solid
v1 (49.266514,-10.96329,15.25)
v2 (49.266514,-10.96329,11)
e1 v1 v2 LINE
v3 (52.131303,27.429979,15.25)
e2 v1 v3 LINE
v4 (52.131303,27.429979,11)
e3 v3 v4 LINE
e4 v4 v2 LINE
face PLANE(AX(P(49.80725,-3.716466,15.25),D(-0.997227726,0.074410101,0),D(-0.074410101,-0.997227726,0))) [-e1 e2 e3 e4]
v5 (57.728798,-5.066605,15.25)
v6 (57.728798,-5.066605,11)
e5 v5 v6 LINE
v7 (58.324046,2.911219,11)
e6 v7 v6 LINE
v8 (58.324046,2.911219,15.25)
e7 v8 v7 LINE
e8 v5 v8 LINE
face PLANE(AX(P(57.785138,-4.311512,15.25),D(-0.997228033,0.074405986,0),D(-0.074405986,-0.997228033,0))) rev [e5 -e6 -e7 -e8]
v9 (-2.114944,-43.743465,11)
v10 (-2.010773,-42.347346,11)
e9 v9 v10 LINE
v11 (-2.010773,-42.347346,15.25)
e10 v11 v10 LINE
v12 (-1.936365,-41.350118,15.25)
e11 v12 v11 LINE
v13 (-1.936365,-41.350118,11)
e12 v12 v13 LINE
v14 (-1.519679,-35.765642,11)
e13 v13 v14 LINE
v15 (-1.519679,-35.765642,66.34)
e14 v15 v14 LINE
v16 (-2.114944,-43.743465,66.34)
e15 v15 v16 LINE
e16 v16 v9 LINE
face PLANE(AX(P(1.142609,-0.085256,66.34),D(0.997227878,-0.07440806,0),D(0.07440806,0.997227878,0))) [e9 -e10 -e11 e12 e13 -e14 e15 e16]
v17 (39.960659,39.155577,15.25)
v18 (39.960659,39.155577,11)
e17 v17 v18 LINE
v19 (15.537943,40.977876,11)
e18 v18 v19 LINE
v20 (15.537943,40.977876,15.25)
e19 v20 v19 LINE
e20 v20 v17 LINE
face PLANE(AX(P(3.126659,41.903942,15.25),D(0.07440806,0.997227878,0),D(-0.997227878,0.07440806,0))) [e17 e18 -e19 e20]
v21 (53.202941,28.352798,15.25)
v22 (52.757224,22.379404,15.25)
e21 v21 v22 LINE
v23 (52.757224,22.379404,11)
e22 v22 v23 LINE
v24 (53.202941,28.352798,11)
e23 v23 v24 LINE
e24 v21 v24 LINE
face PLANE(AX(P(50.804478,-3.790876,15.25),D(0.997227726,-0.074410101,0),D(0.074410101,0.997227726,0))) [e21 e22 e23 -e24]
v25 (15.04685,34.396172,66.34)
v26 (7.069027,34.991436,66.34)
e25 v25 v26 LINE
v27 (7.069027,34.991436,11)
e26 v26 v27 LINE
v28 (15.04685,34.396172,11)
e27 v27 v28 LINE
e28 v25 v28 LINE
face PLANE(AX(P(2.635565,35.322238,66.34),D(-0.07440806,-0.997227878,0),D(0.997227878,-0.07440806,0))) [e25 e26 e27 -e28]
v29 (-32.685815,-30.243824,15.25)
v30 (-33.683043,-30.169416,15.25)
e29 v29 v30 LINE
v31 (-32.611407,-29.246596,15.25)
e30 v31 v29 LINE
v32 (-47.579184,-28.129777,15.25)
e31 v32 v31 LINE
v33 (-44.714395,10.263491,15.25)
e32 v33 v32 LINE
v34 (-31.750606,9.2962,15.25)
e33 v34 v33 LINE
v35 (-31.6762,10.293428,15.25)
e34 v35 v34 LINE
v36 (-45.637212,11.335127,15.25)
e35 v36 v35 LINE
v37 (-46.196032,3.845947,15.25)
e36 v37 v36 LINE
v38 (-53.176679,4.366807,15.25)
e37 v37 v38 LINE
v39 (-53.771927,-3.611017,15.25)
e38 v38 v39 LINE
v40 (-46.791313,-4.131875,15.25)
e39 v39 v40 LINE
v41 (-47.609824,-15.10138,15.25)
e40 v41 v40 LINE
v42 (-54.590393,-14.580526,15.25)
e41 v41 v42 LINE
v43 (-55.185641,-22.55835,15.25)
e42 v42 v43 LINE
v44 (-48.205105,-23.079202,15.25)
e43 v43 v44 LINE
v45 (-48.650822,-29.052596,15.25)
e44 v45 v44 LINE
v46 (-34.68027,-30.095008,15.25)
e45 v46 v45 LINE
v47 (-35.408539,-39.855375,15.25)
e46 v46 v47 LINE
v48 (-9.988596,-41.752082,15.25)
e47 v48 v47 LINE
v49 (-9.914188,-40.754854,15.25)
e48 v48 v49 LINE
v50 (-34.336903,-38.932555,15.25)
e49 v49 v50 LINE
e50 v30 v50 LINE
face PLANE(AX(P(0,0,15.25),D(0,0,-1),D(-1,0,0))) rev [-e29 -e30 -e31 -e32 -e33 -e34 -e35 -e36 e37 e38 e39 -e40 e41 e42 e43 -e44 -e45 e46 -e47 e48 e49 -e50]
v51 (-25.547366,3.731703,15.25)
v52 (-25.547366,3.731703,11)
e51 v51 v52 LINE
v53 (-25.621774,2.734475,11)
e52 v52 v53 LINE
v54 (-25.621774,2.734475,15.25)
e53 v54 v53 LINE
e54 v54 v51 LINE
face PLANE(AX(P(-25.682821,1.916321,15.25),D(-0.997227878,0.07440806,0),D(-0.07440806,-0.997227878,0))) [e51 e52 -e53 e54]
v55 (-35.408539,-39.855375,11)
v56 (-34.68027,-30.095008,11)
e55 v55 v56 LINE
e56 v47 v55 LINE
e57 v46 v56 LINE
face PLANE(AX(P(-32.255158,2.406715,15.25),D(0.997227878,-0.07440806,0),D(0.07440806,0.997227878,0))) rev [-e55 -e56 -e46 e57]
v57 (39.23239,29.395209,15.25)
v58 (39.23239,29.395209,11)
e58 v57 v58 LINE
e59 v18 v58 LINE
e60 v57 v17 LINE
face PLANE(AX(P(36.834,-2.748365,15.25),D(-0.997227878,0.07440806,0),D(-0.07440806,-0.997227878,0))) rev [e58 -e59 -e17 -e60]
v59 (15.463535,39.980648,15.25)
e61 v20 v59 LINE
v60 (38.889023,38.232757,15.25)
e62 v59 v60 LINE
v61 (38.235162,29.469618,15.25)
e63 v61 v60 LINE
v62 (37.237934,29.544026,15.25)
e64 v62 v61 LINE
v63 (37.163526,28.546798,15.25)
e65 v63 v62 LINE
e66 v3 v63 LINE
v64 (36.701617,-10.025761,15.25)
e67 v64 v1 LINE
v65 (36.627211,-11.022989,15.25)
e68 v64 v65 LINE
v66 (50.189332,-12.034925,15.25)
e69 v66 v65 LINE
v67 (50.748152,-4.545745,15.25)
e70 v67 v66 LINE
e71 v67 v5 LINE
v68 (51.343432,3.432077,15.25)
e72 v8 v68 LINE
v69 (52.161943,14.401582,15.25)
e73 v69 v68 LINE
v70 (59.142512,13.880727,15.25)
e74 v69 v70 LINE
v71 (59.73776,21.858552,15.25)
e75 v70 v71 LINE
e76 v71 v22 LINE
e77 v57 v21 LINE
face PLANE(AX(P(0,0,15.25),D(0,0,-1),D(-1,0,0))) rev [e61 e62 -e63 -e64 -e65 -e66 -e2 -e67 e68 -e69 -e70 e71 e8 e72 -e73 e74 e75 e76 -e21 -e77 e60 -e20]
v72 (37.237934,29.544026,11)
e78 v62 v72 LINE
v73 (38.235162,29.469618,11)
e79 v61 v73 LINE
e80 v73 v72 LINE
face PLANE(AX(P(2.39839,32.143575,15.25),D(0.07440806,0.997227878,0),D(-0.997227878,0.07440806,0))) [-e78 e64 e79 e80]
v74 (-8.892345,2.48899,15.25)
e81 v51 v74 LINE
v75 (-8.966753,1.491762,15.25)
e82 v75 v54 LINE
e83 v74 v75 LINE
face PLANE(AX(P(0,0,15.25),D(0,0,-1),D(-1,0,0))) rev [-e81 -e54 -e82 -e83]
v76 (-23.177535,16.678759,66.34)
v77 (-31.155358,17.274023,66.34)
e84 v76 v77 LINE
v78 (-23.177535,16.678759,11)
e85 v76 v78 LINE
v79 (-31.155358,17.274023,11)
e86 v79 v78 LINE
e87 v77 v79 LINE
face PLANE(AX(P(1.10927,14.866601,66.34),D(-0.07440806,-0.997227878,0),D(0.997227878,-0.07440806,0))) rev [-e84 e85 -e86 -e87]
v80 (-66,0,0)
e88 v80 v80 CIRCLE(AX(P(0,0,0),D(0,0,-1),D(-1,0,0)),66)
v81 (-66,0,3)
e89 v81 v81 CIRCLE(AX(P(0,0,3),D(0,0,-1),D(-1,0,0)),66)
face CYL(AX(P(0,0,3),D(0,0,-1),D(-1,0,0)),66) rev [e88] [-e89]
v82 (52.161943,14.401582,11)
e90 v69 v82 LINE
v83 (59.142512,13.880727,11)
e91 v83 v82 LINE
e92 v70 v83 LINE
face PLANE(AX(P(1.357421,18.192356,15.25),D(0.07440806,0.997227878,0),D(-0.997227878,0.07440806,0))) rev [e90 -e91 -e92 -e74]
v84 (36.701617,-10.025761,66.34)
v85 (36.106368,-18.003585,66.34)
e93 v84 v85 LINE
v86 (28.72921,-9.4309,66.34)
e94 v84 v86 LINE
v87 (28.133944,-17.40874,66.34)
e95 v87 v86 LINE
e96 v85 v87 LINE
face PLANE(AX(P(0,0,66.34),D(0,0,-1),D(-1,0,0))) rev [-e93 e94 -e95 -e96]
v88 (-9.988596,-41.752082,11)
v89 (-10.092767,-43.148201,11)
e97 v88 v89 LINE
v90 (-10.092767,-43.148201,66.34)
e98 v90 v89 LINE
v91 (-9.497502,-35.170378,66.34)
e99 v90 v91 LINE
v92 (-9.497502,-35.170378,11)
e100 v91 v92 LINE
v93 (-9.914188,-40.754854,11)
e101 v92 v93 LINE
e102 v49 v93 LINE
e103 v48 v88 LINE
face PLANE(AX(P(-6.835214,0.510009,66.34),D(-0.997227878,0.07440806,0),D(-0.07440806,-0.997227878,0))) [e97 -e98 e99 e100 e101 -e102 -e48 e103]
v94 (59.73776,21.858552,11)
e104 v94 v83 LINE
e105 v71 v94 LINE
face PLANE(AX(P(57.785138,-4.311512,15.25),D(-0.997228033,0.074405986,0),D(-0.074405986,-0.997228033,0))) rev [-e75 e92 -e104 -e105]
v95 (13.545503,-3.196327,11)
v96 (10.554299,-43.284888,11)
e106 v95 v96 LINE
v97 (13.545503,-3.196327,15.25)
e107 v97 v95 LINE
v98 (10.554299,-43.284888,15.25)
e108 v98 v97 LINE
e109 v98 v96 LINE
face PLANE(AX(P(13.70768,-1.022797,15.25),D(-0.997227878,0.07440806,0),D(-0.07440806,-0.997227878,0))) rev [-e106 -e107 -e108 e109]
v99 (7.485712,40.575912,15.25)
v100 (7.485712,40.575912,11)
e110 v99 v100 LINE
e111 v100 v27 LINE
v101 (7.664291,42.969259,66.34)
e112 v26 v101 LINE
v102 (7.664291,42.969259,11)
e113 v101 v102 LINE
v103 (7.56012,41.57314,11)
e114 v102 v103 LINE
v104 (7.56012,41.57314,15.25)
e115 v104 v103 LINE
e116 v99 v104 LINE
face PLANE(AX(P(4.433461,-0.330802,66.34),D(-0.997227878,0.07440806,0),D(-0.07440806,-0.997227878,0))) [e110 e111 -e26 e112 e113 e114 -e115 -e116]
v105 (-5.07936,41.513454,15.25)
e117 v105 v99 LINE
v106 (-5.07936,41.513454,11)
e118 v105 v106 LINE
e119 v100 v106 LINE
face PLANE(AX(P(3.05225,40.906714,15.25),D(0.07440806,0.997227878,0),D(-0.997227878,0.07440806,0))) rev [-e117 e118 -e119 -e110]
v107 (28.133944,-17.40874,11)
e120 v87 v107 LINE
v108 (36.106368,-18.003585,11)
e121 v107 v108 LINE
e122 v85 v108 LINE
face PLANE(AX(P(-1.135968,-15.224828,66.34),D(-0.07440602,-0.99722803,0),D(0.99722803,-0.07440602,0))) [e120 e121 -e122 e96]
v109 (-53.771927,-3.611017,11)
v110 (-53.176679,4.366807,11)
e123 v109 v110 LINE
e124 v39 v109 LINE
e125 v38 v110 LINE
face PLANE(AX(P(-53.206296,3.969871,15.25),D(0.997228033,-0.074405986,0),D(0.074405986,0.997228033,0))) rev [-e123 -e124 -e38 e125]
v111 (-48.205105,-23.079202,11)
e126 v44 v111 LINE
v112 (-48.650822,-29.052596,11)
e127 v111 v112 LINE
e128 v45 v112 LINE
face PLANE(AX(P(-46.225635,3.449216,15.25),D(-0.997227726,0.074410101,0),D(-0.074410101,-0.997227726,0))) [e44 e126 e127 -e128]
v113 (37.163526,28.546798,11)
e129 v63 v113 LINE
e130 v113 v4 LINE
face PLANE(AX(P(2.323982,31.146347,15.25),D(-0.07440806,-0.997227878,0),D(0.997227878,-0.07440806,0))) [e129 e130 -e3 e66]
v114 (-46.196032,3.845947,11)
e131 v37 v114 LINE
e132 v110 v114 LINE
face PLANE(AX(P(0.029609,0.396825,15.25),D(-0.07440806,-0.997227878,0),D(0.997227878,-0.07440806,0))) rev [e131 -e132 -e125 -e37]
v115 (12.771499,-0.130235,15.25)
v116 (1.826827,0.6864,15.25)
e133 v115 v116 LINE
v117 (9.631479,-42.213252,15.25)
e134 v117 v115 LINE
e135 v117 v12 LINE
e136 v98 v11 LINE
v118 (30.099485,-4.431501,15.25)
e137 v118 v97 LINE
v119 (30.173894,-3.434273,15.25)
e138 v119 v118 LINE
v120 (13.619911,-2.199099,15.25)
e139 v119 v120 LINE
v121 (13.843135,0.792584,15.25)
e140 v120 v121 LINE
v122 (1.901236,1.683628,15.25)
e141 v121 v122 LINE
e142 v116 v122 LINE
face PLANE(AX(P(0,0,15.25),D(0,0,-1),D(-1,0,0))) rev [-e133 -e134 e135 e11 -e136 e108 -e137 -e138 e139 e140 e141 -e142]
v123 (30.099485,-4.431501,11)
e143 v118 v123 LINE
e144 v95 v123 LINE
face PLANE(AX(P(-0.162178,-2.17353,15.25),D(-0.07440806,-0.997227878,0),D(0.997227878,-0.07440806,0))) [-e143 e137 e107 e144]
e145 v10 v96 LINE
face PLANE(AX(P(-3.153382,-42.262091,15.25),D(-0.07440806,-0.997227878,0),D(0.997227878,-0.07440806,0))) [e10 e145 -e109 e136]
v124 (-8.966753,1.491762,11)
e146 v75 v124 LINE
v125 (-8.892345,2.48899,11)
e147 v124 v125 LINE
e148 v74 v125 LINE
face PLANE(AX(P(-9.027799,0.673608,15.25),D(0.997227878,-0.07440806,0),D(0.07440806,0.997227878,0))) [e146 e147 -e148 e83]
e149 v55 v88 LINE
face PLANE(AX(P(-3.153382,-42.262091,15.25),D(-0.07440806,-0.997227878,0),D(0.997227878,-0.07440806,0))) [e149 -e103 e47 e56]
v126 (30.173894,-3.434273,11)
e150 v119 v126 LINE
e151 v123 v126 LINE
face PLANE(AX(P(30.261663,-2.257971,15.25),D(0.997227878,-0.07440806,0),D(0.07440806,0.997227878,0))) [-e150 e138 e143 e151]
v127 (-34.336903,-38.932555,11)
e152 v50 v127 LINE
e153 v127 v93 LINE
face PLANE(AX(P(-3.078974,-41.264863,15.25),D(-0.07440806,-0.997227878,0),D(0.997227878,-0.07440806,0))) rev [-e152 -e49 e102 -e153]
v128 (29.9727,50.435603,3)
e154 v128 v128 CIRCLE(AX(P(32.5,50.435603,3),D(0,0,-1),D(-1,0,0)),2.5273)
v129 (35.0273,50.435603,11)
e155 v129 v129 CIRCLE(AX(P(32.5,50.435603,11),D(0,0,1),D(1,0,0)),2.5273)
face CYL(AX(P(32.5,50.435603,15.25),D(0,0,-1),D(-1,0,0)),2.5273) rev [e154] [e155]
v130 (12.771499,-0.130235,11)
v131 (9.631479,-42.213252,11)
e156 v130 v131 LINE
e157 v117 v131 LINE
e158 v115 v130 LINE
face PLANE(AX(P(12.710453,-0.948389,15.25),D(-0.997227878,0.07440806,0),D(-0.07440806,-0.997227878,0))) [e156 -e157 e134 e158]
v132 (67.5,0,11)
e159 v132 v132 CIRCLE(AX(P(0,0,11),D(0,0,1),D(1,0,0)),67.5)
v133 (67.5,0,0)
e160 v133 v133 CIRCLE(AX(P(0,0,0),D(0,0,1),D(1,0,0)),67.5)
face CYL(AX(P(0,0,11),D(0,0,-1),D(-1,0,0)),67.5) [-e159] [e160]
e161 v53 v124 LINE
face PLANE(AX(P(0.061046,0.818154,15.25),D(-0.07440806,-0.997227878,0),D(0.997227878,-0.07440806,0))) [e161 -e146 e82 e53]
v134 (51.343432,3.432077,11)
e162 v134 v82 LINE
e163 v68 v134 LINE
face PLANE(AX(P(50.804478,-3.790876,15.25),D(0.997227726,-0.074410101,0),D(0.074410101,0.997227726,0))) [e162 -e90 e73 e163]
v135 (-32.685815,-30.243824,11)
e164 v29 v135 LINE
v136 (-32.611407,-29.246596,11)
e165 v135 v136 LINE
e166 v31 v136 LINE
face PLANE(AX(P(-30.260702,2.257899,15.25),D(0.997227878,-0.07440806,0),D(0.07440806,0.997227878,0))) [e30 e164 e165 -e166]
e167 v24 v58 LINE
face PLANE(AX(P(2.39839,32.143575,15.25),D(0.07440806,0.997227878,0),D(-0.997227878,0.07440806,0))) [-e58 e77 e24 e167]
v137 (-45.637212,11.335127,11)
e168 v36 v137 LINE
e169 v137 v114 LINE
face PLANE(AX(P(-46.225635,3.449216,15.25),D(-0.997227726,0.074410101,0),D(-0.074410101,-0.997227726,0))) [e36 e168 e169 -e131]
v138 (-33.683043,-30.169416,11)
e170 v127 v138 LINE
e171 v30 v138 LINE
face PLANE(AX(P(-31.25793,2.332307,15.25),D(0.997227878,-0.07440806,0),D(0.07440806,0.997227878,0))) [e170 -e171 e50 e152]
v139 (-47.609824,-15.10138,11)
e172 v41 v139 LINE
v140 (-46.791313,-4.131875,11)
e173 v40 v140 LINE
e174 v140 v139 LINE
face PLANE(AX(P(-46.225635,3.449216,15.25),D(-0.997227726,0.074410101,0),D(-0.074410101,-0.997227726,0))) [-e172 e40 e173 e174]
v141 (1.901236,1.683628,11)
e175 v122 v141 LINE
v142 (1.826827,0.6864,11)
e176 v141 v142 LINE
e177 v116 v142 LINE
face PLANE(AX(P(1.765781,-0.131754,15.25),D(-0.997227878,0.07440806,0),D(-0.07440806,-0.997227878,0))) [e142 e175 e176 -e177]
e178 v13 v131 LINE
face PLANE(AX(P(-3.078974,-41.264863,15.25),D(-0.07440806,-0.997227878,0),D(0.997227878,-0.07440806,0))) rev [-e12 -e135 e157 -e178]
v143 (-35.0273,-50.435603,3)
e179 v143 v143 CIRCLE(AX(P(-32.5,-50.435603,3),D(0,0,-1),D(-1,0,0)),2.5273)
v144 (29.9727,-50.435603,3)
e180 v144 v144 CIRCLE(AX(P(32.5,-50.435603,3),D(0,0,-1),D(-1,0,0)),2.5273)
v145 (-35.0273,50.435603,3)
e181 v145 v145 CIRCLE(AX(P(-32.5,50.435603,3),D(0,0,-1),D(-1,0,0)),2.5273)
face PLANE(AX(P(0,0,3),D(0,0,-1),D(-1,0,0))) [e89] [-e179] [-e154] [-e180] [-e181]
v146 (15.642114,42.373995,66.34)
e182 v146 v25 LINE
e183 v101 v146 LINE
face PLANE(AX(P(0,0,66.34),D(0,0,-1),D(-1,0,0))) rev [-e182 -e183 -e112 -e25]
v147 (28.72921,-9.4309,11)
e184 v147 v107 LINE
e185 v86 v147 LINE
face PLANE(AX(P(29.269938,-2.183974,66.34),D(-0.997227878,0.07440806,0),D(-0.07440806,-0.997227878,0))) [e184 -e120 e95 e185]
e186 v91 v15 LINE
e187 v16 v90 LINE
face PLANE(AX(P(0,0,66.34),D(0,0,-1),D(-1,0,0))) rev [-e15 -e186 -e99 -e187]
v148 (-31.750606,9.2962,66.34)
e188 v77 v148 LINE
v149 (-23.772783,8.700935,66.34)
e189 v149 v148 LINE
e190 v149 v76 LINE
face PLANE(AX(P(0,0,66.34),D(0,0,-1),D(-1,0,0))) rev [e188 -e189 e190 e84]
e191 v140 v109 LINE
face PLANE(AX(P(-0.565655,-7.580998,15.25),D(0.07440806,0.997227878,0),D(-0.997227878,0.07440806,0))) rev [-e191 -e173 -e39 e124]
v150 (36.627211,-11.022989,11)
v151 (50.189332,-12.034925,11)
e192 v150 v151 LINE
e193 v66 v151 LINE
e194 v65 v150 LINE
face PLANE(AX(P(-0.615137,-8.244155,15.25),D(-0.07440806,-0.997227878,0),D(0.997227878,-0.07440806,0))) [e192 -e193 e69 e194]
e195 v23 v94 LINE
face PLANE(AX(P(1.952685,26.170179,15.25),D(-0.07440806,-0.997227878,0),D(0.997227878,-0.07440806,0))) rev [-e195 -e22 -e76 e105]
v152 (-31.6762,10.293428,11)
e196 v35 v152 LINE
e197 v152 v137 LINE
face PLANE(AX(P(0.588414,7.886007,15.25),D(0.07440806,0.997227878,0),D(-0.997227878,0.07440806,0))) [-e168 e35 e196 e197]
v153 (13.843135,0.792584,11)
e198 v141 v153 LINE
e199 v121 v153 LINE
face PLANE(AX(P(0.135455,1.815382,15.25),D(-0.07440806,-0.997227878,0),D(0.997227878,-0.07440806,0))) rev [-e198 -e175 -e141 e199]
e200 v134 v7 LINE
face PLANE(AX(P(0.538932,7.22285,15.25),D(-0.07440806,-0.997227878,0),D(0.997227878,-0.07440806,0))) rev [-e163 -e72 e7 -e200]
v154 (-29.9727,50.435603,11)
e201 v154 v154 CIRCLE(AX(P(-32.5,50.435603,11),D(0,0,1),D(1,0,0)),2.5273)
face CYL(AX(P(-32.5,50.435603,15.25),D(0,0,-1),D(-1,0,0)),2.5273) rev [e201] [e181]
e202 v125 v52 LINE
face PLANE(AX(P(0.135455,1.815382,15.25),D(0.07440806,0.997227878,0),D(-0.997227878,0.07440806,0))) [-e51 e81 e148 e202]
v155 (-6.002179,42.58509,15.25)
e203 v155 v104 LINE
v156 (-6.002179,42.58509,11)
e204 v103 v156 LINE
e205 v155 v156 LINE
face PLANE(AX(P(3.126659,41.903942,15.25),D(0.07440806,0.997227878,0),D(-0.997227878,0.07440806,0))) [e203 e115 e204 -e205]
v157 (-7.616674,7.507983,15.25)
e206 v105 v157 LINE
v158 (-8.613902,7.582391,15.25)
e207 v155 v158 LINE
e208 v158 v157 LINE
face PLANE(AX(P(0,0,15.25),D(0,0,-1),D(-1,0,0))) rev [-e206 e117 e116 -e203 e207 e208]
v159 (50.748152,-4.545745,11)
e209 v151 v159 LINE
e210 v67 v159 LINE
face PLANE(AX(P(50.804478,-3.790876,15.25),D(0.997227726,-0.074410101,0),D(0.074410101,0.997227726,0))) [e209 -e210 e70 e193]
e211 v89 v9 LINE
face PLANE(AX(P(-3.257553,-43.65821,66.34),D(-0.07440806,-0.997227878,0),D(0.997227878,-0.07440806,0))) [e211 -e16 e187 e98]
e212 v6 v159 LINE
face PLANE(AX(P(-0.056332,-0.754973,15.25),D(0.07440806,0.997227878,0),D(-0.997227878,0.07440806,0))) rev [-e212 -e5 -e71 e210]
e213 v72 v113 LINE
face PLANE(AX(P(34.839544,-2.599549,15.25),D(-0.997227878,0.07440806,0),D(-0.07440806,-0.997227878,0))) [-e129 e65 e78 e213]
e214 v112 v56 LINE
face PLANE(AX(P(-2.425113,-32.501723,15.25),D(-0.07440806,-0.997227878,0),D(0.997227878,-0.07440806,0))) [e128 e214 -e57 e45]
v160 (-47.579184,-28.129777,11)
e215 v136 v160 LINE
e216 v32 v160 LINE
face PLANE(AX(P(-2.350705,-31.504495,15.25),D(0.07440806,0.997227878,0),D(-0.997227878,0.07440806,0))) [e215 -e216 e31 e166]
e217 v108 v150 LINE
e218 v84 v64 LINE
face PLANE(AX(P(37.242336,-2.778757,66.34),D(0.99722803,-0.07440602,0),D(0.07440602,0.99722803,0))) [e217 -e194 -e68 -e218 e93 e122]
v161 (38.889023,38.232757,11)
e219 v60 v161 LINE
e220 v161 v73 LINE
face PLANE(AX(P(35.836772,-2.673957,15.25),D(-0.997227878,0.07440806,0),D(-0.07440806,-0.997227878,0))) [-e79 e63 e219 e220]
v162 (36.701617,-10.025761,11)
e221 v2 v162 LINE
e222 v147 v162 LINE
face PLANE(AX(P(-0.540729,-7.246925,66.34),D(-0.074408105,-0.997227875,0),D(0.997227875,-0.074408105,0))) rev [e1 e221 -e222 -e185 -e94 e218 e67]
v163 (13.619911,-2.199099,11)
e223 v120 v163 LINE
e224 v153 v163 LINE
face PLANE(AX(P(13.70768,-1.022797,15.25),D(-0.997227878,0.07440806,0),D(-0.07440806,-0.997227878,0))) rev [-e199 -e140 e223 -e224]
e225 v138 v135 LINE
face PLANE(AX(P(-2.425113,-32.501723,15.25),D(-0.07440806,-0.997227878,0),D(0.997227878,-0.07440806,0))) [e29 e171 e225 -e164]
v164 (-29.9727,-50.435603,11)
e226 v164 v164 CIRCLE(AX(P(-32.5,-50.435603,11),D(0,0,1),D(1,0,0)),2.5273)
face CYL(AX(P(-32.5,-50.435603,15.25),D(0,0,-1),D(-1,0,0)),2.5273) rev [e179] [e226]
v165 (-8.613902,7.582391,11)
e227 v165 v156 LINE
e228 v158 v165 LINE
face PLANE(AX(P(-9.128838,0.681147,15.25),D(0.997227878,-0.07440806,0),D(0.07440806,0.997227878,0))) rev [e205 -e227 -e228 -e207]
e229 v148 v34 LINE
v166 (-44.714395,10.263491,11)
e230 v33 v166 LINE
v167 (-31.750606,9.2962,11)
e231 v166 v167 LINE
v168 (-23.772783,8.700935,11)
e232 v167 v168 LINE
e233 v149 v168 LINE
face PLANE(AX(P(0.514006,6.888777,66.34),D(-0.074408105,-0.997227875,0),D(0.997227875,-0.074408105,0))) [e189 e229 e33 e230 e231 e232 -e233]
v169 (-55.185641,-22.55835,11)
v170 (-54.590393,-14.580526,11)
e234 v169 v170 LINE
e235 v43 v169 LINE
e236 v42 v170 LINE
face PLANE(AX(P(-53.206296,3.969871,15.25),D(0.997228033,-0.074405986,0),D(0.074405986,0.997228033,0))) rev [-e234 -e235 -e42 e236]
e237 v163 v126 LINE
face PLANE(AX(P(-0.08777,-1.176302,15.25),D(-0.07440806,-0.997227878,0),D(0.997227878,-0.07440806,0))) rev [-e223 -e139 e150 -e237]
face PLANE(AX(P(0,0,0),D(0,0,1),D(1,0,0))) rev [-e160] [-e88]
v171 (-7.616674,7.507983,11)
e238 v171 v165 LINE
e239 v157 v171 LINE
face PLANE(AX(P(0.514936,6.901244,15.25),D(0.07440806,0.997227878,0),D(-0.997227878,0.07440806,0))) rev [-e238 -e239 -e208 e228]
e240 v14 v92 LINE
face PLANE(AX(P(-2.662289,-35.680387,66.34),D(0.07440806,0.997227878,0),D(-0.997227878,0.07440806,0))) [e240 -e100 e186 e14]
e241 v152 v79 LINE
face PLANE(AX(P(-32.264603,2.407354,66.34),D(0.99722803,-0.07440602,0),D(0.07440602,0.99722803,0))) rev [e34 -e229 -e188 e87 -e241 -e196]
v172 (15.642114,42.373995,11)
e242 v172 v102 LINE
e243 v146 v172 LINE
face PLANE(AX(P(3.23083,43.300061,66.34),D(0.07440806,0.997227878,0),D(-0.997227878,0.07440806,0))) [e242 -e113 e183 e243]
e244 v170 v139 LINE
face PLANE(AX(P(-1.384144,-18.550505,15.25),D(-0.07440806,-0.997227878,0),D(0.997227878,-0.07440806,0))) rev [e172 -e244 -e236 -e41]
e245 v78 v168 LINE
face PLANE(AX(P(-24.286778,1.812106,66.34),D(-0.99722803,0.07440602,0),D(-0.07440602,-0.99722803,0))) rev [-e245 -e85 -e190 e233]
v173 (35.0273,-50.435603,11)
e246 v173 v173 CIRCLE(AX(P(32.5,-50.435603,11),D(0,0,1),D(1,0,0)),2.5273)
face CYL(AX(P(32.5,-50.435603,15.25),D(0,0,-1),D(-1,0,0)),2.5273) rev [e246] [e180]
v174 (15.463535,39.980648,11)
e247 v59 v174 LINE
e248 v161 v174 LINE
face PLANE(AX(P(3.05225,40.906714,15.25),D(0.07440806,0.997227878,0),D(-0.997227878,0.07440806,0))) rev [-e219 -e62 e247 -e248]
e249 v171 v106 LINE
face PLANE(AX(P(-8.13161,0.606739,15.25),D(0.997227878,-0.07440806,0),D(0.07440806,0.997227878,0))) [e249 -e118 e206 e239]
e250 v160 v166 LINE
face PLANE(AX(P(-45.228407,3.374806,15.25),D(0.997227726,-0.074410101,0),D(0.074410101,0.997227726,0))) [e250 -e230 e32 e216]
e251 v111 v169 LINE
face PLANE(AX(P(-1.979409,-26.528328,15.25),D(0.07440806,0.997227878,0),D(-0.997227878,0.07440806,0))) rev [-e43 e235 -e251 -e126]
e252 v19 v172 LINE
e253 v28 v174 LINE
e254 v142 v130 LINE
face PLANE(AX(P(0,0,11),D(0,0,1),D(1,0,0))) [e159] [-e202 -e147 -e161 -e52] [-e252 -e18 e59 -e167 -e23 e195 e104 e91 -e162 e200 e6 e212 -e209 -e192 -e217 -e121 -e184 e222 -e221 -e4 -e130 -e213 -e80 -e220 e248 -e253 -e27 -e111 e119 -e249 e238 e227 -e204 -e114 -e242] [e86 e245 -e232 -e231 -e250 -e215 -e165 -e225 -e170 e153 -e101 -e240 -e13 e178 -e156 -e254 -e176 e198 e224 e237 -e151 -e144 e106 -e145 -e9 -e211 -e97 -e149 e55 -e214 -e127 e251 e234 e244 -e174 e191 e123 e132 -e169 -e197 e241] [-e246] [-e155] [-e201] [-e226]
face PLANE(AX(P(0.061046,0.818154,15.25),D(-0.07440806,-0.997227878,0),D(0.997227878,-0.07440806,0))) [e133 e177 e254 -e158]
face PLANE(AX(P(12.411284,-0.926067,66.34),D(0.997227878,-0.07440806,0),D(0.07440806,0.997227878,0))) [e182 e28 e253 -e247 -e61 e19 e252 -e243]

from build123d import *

# Parameters (mm, degrees)
SKETCH2_R            = 67.5
BOSS_EXTRUDE2_DEPTH  = 11
SKETCH3_R            = 66
CUT_EXTRUDE11_DEPTH  = 3
BOSS_EXTRUDE3_DEPTH  = 63.34
BOSS_EXTRUDE10_DEPTH = 12.25
BOSS_EXTRUDE11_DEPTH = 12.25
BOSS_EXTRUDE12_START = -12.25
BOSS_EXTRUDE12_DEPTH = 4.25
BOSS_EXTRUDE13_DEPTH = 12.25
SKETCH4_10_R         = 2.5273
CUT_EXTRUDE12_DEPTH  = 12.25


# Read off the part's stored shape, not the designer's step: Boss-Extrude12
with BuildPart() as part:
    # Sketch2 → Boss-Extrude2 (new body)
    with BuildSketch(Plane.XY):
        Circle(SKETCH2_R)
    extrude(amount=BOSS_EXTRUDE2_DEPTH)

    # Sketch3 → Cut-Extrude11 (cut)
    with BuildSketch(Plane(origin=(0, 0, 0), x_dir=(-1, 0, 0), z_dir=(0, 0, -1))):
        Circle(SKETCH3_R)
    extrude(amount=-CUT_EXTRUDE11_DEPTH, mode=Mode.SUBTRACT)

    # Sketch4 → Boss-Extrude3 (add)
    with BuildSketch(Plane(origin=(0, 0, 3), x_dir=(-1, 0, 0), z_dir=(0, 0, -1))):
        Polygon((-36.106368438, -18.003584956), (-28.133944044, -17.408739697), (-28.729209741, -9.430900362), (-36.701616568, -10.025761076), (-36.627210549, -11.022989106), align=None)
        Polygon((2.114943846, -43.743465349), (10.09276687, -43.148200869), (9.49750239, -35.170377845), (1.519679366, -35.765642325), align=None)
        Polygon((31.67620014, 10.293427606), (31.75060616, 9.296199576), (23.772783163, 8.700934735), (23.177535005, 16.678758977), (31.155358029, 17.274023457), align=None)
        Polygon((-7.664290982, 42.969259013), (-15.642114006, 42.373994533), (-15.046849526, 34.396171509), (-7.069026502, 34.991435989), align=None)
    extrude(amount=-BOSS_EXTRUDE3_DEPTH)



with BuildPart() as body_2:
    # Sketch4<6> → Boss-Extrude10 (new body)
    with BuildSketch(Plane(origin=(0, 0, 3), x_dir=(-1, 0, 0), z_dir=(0, 0, -1))):
        Polygon((-37.237933985, 29.544025614), (-53.20294076, 28.352798205), (-50.189331626, -12.034925436), (-36.627210549, -11.022989106), (-36.701616568, -10.025761076), (-49.266513848, -10.96328965), (-52.131302781, 27.429978539), (-37.163525925, 28.546797736), align=None)
    extrude(amount=-BOSS_EXTRUDE10_DEPTH)


with BuildPart() as part_1:
    add(part.part)

    add(body_2.part)  # Boss-Extrude11 merges body 2
    # Sketch4<7> → Boss-Extrude11 (add)
    with BuildSketch(Plane(origin=(0, 0, 3), x_dir=(-1, 0, 0), z_dir=(0, 0, -1))):
        Polygon((-15.463534662, 39.980647626), (-15.537942722, 40.977875504), (-39.960658599, 39.155576962), (-39.232389741, 29.395209494), (-38.235161863, 29.469617554), (-38.889022661, 38.232757144), align=None)
        Polygon((6.002179443, 42.585089599), (-7.560119698, 41.573139984), (-7.485711638, 40.575912106), (5.079359625, 41.513453661), (7.61667447, 7.507983023), (8.613902348, 7.582391083), align=None)
    extrude(amount=-BOSS_EXTRUDE11_DEPTH)

    # Boss-Extrude12 outline → Boss-Extrude12 (add)
    with BuildSketch(Plane(origin=(0, 0, 3), x_dir=(-1, 0, 0), z_dir=(0, 0, -1)).offset(BOSS_EXTRUDE12_START)):
        Polygon((31.67620014, 10.293427606), (31.75060616, 9.296199576), (44.714394547, 10.263491961), (47.579183525, -28.129776815), (32.611406667, -29.246596012), (32.685814727, -30.24382389), (33.683042605, -30.16941583), (34.336903403, -38.93255542), (9.914187526, -40.754853962), (9.988595586, -41.75208184), (35.408539341, -39.855375238), (34.680270483, -30.09500777), (48.650821503, -29.05259648), (45.637212368, 11.33512716), align=None)
        Polygon((-13.619910772, -2.199099303), (-30.173893546, -3.434273099), (-30.099485486, -4.431500977), (-13.545502712, -3.196327181), (-10.5542987, -43.284887875), (2.010772562, -42.347346319), (1.936364502, -41.350118441), (-9.631478882, -42.213251937), (-12.771499014, -0.130235487), (-1.826827461, 0.686400104), (-1.901235521, 1.683627982), (-13.843134952, 0.792584331), align=None)
        Polygon((25.621774288, 2.734474823), (25.547366228, 3.731702701), (8.892344879, 2.488989922), (8.966752939, 1.491762044), align=None)
    extrude(amount=BOSS_EXTRUDE12_DEPTH)

    # Sketch4<9> → Boss-Extrude13 (add)
    with BuildSketch(Plane(origin=(0, 0, 3), x_dir=(-1, 0, 0), z_dir=(0, 0, -1))):
        Polygon((-50.748151509, -4.545744855), (-51.343432315, 3.432076951), (-58.324046353, 2.911219122), (-57.728798463, -5.06660514), align=None)
        Polygon((-52.161943422, 14.401581934), (-52.757224228, 22.379403739), (-59.737760091, 21.858551743), (-59.142512201, 13.880727481), align=None)
        Polygon((46.196032252, 3.845946579), (46.791313057, -4.131875227), (53.771927095, -3.611017397), (53.176679206, 4.366806864), align=None)
        Polygon((47.609824165, -15.10138021), (48.205104971, -23.079202015), (55.185640833, -22.558350019), (54.590392944, -14.580525757), align=None)
    extrude(amount=-BOSS_EXTRUDE13_DEPTH)

    # Sketch4<10> → Cut-Extrude12 (cut)
    with BuildSketch(Plane(origin=(0, 0, 3), x_dir=(-1, 0, 0), z_dir=(0, 0, -1))):
        with Locations((-32.5, 50.435602505)):
            Circle(SKETCH4_10_R)
        with Locations((-32.5, -50.435602505)):
            Circle(SKETCH4_10_R)
        with Locations((32.5, -50.435602505)):
            Circle(SKETCH4_10_R)
        with Locations((32.5, 50.435602505)):
            Circle(SKETCH4_10_R)
    extrude(amount=-CUT_EXTRUDE12_DEPTH, mode=Mode.SUBTRACT)


solid = part_1.part
